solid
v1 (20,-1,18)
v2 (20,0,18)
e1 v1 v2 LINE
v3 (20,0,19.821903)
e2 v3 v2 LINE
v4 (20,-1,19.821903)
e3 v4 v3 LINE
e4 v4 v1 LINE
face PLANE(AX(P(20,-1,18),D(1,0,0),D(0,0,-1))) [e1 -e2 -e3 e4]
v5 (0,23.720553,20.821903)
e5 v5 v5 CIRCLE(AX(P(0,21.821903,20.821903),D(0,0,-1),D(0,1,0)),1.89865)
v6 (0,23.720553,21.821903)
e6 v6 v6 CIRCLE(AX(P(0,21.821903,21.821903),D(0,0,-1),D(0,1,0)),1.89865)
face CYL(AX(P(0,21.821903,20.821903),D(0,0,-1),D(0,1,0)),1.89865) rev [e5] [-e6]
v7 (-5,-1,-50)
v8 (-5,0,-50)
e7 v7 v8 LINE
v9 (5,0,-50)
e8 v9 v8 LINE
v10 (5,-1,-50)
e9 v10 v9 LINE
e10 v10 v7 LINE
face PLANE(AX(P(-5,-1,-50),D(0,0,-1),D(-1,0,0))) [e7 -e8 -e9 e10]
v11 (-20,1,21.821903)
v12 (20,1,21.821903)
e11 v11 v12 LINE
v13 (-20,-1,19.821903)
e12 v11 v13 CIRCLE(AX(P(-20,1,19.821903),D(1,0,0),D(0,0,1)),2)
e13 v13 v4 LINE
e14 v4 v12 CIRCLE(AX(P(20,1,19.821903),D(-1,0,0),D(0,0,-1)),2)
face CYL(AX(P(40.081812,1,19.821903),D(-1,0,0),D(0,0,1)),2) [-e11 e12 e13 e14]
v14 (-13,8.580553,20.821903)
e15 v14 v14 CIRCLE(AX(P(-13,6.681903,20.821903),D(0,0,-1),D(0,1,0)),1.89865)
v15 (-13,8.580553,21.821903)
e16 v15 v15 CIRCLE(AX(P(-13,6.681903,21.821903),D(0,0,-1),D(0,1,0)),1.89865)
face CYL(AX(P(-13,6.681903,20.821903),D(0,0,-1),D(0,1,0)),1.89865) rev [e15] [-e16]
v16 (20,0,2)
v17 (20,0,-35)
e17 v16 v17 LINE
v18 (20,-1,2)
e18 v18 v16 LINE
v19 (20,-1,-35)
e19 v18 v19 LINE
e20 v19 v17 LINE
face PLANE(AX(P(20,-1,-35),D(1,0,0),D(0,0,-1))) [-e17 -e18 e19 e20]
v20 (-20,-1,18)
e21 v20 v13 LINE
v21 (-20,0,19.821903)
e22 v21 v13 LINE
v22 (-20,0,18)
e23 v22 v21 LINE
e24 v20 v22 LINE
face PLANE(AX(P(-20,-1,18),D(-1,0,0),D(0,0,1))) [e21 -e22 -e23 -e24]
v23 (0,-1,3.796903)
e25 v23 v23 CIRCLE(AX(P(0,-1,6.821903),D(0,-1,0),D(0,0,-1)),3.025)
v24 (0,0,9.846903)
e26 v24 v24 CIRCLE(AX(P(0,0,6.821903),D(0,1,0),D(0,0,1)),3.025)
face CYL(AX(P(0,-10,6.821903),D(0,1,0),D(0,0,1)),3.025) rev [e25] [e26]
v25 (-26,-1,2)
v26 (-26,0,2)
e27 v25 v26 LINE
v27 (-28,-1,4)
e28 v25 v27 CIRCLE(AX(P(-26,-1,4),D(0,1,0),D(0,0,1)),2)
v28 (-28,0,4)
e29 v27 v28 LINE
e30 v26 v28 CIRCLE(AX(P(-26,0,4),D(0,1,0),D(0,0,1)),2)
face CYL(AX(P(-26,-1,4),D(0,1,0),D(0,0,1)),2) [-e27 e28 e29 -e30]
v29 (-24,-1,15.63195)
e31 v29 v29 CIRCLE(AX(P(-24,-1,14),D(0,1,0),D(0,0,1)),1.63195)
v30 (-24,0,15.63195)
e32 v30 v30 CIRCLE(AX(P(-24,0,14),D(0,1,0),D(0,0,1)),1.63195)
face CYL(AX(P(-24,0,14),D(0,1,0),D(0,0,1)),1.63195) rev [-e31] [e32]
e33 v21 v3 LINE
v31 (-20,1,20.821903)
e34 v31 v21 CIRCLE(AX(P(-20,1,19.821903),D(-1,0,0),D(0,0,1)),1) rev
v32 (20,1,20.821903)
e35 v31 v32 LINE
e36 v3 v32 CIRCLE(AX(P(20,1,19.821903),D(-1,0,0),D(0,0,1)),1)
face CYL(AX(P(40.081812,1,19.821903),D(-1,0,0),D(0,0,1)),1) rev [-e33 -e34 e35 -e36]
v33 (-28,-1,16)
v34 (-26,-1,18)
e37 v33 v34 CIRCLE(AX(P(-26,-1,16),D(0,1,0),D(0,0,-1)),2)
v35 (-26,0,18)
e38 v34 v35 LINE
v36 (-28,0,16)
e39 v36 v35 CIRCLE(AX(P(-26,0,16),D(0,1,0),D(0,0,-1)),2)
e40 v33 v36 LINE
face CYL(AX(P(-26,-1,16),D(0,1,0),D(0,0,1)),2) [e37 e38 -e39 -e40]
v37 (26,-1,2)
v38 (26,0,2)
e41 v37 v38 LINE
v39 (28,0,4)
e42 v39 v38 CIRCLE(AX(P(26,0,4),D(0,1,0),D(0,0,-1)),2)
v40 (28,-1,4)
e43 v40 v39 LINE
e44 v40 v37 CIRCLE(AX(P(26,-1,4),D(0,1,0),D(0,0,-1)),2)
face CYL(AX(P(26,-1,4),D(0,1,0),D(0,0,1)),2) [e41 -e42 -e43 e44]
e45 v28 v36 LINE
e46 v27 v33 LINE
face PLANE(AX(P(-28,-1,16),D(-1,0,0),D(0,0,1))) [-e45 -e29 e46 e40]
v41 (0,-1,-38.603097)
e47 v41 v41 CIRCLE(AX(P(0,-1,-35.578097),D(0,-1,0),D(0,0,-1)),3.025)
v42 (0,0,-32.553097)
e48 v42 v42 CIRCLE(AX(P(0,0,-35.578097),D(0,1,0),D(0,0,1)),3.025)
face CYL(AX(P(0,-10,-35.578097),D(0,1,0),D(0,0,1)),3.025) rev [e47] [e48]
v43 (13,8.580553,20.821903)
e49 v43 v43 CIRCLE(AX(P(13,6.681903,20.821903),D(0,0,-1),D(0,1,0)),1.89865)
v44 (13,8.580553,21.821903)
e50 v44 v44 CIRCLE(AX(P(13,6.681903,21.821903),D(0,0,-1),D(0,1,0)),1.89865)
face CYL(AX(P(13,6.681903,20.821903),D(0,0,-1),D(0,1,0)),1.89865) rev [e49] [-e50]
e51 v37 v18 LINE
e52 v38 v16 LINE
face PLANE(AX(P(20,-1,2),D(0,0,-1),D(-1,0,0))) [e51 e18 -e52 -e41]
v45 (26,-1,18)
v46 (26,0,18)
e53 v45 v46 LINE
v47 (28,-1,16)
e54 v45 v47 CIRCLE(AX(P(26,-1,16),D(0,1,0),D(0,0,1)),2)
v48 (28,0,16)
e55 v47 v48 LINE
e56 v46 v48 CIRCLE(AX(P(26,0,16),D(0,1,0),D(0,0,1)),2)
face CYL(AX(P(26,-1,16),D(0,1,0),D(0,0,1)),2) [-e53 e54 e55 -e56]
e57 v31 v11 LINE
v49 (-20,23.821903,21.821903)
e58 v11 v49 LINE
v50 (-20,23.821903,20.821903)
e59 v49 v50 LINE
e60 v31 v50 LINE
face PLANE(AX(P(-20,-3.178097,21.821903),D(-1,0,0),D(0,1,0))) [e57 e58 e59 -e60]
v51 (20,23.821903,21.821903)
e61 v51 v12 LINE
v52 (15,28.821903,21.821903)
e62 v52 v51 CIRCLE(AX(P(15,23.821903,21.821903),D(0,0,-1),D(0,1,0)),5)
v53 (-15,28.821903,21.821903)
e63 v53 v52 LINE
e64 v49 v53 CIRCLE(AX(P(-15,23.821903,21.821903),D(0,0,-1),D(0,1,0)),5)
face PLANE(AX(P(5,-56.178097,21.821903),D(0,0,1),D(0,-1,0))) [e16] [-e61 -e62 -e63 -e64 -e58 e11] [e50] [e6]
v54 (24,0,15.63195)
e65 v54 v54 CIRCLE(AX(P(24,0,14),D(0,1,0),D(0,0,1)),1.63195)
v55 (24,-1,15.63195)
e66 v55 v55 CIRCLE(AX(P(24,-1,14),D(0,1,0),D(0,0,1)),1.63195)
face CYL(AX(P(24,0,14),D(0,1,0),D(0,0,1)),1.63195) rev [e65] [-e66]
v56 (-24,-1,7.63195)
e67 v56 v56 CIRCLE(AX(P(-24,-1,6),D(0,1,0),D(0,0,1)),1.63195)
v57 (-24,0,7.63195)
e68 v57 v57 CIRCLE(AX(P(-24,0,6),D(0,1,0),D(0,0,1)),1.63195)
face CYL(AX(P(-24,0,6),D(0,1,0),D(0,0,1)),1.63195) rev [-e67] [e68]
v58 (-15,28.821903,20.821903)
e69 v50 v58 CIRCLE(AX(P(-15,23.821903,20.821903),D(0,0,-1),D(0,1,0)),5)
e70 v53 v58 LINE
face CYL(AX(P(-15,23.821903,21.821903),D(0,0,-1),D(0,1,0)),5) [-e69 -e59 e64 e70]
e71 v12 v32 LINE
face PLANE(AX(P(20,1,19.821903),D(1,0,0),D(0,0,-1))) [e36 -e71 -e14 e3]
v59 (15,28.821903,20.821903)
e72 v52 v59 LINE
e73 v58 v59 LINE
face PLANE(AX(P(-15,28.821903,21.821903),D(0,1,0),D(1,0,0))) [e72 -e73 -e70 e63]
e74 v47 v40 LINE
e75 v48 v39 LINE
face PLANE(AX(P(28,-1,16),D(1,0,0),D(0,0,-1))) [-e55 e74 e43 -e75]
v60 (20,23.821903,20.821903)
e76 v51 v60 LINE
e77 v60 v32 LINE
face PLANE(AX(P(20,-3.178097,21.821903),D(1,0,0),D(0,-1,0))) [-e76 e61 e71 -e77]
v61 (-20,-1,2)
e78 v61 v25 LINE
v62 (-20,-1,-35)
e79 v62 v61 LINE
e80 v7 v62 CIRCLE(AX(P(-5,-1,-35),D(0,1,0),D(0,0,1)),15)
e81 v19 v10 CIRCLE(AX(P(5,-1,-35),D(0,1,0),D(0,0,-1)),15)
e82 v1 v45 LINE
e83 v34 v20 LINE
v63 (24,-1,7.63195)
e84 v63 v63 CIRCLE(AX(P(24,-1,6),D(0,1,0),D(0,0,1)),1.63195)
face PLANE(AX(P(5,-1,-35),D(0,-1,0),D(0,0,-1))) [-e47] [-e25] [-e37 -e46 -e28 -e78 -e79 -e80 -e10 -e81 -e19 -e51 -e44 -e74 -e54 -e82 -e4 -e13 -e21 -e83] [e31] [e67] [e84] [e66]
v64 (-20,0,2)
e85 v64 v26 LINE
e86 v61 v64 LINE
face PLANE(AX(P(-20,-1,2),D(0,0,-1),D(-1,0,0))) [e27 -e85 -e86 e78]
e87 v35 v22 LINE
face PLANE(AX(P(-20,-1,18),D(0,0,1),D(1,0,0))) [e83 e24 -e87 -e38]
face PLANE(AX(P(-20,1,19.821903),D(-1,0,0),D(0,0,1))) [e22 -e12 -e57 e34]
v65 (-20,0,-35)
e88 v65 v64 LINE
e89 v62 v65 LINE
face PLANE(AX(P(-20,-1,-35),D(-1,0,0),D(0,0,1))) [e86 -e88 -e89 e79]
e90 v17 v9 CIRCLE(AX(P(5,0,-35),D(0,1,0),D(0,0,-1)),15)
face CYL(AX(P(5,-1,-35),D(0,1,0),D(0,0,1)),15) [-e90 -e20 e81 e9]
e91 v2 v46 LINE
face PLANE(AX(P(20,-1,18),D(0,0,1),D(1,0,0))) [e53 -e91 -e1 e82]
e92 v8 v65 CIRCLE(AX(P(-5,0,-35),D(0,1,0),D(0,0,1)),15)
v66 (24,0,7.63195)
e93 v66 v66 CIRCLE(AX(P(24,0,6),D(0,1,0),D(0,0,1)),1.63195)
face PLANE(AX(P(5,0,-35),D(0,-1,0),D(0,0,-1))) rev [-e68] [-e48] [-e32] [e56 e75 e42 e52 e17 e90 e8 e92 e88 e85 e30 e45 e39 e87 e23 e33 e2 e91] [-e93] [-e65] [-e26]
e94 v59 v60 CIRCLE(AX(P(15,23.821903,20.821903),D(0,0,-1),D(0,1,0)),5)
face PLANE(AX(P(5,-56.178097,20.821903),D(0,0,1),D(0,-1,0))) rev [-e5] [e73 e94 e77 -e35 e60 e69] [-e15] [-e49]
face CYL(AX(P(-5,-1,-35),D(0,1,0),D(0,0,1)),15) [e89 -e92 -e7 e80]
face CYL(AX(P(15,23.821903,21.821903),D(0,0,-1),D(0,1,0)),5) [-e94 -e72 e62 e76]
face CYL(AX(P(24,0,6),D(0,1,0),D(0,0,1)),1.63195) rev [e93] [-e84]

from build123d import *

# Parameters (mm, degrees)
BASE_FLANGE1_DEPTH       = 1
SKETCHED_START           = 21.616422755
SKETCHED_BEND1_OUTLINE_W = 40
SKETCHED_BEND1_OUTLINE_H = 1
SKETCHED_BEND1_DEPTH     = 28.383577245
SKETCHED_START_2         = 20.821902755
SKETCHED_BEND1_2_DEPTH   = 0.00548
SKETCHED_START_3         = 19.821902755
SKETCHED_BEND1_3_DEPTH   = 2
SKETCHED_START_4         = -20
SKETCHED_BEND1_4_DEPTH   = 40
SKETCH7_R                = 3.025
CUT_EXTRUDE1_DEPTH       = 10
F_6_CLEARANCE_HOLE1_D    = 3.7973
F_4_CLEARANCE_HOLE2_D    = 3.2639


with BuildPart() as part:
    # Base-Flange1: sheet metal written as solids
    # Sketch1 → Base-Flange1 (new body)
    with BuildSketch(Plane(origin=(0, 0, 0), x_dir=(1, 0, 0), z_dir=(0, 1, 0))):
        with BuildLine():
            Line((-20, -18), (-20, -45))
            ThreePointArc((-20, -45), (-18.535533906, -48.535533906), (-15, -50))
            Line((-15, -50), (15, -50))
            ThreePointArc((15, -50), (18.535533906, -48.535533906), (20, -45))
            Line((20, -45), (20, -18))
            Line((20, -18), (26, -18))
            ThreePointArc((26, -18), (27.414213562, -17.414213562), (28, -16))
            Line((28, -16), (28, -4))
            ThreePointArc((28, -4), (27.414213562, -2.585786438), (26, -2))
            Line((26, -2), (20, -2))
            Line((20, -2), (20, 35))
            ThreePointArc((20, 35), (15.606601718, 45.606601718), (5, 50))
            Line((5, 50), (-5, 50))
            ThreePointArc((-5, 50), (-15.606601718, 45.606601718), (-20, 35))
            Line((-20, 35), (-20, -2))
            Line((-20, -2), (-26, -2))
            ThreePointArc((-26, -2), (-27.414213562, -2.585786438), (-28, -4))
            Line((-28, -4), (-28, -16))
            ThreePointArc((-28, -16), (-27.414213562, -17.414213562), (-26, -18))
            Line((-26, -18), (-20, -18))
        make_face()
    extrude(amount=-BASE_FLANGE1_DEPTH)

    # Sketched Bend1: read off the stored shape, not the designer's step
    # Sketched Bend1 outline → Sketched Bend1 (cut)
    with BuildSketch(Plane.XY.offset(SKETCHED_START)):
        with Locations((0, -0.5)):
            Rectangle(SKETCHED_BEND1_OUTLINE_W, SKETCHED_BEND1_OUTLINE_H)
    extrude(amount=SKETCHED_BEND1_DEPTH, mode=Mode.SUBTRACT)

    # Sketched Bend1 2 outline → Sketched Bend1 2 (add)
    with BuildSketch(Plane.XY.offset(SKETCHED_START_2)):
        with BuildLine():
            Line((20, 0), (20, 23.821902755))
            ThreePointArc((20, 23.821902755), (18.535533906, 27.357436661), (15, 28.821902755))
            Line((15, 28.821902755), (-15, 28.821902755))
            ThreePointArc((-15, 28.821902755), (-18.535533906, 27.357436661), (-20, 23.821902755))
            Line((-20, 23.821902755), (-20, 0))
            Line((-20, 0), (20, 0))
        make_face()
    extrude(amount=SKETCHED_BEND1_2_DEPTH)

    # Sketched Bend1 3 outline → Sketched Bend1 3 (add)
    with BuildSketch(Plane.XY.offset(SKETCHED_START_3)):
        with BuildLine():
            Line((20, 0), (20, 23.821902755))
            ThreePointArc((20, 23.821902755), (18.535533906, 27.357436661), (15, 28.821902755))
            Line((15, 28.821902755), (-15, 28.821902755))
            ThreePointArc((-15, 28.821902755), (-18.535533906, 27.357436661), (-20, 23.821902755))
            Line((-20, 23.821902755), (-20, 0))
            Line((-20, 0), (20, 0))
        make_face()
    extrude(amount=SKETCHED_BEND1_3_DEPTH)

    # Sketched Bend1 4 outline → Sketched Bend1 4 (cut)
    with BuildSketch(Plane.YZ.offset(SKETCHED_START_4)):
        with BuildLine():
            Line((28.821902755, 19.821902755), (28.821902755, 20.821902755))
            Line((28.821902755, 20.821902755), (1, 20.821902755))
            ThreePointArc((1, 20.821902755), (0.292893219, 20.529009536), (0, 19.821902755))
            Line((0, 19.821902755), (28.821902755, 19.821902755))
        make_face()
        with BuildLine():
            ThreePointArc((-1, 19.821902755), (-0.414213562, 21.236116317), (1, 21.821902755))
            Line((1, 21.821902755), (0, 21.821902755))
            Line((0, 21.821902755), (0, 21.616422755))
            Line((0, 21.616422755), (-1, 21.616422755))
            Line((-1, 21.616422755), (-1, 19.821902755))
        make_face()
    extrude(amount=SKETCHED_BEND1_4_DEPTH, mode=Mode.SUBTRACT)

    # Sketch7 → Cut-Extrude1 (cut)
    with BuildSketch(Plane(origin=(0, 0, 0), x_dir=(1, 0, 0), z_dir=(0, 1, 0))):
        with Locations(Location((0, -6.821902755, 0), (0, 0, 270))):
            Circle(SKETCH7_R)
        with Locations(Location((0, 35.578097245, 0), (0, 0, 270))):
            Circle(SKETCH7_R)
    extrude(amount=-CUT_EXTRUDE1_DEPTH, mode=Mode.SUBTRACT)

    # #6 Clearance Hole1 (through all)
    with Locations(Plane(origin=(0, 0, 20.821902755), x_dir=(-1, 0, 0), z_dir=(0, 0, -1))):
        with Locations((13, 6.681902755), (-13, 6.681902755), (0, 21.821902755)):
            Hole(F_6_CLEARANCE_HOLE1_D / 2)

    # #4 Clearance Hole2 (through all)
    with Locations(Plane(origin=(0, 0, 0), x_dir=(1, 0, 0), z_dir=(0, 1, 0))):
        with Locations((-24, -6), (-24, -14), (24, -6), (24, -14)):
            Hole(F_4_CLEARANCE_HOLE2_D / 2)


solid = part.part
